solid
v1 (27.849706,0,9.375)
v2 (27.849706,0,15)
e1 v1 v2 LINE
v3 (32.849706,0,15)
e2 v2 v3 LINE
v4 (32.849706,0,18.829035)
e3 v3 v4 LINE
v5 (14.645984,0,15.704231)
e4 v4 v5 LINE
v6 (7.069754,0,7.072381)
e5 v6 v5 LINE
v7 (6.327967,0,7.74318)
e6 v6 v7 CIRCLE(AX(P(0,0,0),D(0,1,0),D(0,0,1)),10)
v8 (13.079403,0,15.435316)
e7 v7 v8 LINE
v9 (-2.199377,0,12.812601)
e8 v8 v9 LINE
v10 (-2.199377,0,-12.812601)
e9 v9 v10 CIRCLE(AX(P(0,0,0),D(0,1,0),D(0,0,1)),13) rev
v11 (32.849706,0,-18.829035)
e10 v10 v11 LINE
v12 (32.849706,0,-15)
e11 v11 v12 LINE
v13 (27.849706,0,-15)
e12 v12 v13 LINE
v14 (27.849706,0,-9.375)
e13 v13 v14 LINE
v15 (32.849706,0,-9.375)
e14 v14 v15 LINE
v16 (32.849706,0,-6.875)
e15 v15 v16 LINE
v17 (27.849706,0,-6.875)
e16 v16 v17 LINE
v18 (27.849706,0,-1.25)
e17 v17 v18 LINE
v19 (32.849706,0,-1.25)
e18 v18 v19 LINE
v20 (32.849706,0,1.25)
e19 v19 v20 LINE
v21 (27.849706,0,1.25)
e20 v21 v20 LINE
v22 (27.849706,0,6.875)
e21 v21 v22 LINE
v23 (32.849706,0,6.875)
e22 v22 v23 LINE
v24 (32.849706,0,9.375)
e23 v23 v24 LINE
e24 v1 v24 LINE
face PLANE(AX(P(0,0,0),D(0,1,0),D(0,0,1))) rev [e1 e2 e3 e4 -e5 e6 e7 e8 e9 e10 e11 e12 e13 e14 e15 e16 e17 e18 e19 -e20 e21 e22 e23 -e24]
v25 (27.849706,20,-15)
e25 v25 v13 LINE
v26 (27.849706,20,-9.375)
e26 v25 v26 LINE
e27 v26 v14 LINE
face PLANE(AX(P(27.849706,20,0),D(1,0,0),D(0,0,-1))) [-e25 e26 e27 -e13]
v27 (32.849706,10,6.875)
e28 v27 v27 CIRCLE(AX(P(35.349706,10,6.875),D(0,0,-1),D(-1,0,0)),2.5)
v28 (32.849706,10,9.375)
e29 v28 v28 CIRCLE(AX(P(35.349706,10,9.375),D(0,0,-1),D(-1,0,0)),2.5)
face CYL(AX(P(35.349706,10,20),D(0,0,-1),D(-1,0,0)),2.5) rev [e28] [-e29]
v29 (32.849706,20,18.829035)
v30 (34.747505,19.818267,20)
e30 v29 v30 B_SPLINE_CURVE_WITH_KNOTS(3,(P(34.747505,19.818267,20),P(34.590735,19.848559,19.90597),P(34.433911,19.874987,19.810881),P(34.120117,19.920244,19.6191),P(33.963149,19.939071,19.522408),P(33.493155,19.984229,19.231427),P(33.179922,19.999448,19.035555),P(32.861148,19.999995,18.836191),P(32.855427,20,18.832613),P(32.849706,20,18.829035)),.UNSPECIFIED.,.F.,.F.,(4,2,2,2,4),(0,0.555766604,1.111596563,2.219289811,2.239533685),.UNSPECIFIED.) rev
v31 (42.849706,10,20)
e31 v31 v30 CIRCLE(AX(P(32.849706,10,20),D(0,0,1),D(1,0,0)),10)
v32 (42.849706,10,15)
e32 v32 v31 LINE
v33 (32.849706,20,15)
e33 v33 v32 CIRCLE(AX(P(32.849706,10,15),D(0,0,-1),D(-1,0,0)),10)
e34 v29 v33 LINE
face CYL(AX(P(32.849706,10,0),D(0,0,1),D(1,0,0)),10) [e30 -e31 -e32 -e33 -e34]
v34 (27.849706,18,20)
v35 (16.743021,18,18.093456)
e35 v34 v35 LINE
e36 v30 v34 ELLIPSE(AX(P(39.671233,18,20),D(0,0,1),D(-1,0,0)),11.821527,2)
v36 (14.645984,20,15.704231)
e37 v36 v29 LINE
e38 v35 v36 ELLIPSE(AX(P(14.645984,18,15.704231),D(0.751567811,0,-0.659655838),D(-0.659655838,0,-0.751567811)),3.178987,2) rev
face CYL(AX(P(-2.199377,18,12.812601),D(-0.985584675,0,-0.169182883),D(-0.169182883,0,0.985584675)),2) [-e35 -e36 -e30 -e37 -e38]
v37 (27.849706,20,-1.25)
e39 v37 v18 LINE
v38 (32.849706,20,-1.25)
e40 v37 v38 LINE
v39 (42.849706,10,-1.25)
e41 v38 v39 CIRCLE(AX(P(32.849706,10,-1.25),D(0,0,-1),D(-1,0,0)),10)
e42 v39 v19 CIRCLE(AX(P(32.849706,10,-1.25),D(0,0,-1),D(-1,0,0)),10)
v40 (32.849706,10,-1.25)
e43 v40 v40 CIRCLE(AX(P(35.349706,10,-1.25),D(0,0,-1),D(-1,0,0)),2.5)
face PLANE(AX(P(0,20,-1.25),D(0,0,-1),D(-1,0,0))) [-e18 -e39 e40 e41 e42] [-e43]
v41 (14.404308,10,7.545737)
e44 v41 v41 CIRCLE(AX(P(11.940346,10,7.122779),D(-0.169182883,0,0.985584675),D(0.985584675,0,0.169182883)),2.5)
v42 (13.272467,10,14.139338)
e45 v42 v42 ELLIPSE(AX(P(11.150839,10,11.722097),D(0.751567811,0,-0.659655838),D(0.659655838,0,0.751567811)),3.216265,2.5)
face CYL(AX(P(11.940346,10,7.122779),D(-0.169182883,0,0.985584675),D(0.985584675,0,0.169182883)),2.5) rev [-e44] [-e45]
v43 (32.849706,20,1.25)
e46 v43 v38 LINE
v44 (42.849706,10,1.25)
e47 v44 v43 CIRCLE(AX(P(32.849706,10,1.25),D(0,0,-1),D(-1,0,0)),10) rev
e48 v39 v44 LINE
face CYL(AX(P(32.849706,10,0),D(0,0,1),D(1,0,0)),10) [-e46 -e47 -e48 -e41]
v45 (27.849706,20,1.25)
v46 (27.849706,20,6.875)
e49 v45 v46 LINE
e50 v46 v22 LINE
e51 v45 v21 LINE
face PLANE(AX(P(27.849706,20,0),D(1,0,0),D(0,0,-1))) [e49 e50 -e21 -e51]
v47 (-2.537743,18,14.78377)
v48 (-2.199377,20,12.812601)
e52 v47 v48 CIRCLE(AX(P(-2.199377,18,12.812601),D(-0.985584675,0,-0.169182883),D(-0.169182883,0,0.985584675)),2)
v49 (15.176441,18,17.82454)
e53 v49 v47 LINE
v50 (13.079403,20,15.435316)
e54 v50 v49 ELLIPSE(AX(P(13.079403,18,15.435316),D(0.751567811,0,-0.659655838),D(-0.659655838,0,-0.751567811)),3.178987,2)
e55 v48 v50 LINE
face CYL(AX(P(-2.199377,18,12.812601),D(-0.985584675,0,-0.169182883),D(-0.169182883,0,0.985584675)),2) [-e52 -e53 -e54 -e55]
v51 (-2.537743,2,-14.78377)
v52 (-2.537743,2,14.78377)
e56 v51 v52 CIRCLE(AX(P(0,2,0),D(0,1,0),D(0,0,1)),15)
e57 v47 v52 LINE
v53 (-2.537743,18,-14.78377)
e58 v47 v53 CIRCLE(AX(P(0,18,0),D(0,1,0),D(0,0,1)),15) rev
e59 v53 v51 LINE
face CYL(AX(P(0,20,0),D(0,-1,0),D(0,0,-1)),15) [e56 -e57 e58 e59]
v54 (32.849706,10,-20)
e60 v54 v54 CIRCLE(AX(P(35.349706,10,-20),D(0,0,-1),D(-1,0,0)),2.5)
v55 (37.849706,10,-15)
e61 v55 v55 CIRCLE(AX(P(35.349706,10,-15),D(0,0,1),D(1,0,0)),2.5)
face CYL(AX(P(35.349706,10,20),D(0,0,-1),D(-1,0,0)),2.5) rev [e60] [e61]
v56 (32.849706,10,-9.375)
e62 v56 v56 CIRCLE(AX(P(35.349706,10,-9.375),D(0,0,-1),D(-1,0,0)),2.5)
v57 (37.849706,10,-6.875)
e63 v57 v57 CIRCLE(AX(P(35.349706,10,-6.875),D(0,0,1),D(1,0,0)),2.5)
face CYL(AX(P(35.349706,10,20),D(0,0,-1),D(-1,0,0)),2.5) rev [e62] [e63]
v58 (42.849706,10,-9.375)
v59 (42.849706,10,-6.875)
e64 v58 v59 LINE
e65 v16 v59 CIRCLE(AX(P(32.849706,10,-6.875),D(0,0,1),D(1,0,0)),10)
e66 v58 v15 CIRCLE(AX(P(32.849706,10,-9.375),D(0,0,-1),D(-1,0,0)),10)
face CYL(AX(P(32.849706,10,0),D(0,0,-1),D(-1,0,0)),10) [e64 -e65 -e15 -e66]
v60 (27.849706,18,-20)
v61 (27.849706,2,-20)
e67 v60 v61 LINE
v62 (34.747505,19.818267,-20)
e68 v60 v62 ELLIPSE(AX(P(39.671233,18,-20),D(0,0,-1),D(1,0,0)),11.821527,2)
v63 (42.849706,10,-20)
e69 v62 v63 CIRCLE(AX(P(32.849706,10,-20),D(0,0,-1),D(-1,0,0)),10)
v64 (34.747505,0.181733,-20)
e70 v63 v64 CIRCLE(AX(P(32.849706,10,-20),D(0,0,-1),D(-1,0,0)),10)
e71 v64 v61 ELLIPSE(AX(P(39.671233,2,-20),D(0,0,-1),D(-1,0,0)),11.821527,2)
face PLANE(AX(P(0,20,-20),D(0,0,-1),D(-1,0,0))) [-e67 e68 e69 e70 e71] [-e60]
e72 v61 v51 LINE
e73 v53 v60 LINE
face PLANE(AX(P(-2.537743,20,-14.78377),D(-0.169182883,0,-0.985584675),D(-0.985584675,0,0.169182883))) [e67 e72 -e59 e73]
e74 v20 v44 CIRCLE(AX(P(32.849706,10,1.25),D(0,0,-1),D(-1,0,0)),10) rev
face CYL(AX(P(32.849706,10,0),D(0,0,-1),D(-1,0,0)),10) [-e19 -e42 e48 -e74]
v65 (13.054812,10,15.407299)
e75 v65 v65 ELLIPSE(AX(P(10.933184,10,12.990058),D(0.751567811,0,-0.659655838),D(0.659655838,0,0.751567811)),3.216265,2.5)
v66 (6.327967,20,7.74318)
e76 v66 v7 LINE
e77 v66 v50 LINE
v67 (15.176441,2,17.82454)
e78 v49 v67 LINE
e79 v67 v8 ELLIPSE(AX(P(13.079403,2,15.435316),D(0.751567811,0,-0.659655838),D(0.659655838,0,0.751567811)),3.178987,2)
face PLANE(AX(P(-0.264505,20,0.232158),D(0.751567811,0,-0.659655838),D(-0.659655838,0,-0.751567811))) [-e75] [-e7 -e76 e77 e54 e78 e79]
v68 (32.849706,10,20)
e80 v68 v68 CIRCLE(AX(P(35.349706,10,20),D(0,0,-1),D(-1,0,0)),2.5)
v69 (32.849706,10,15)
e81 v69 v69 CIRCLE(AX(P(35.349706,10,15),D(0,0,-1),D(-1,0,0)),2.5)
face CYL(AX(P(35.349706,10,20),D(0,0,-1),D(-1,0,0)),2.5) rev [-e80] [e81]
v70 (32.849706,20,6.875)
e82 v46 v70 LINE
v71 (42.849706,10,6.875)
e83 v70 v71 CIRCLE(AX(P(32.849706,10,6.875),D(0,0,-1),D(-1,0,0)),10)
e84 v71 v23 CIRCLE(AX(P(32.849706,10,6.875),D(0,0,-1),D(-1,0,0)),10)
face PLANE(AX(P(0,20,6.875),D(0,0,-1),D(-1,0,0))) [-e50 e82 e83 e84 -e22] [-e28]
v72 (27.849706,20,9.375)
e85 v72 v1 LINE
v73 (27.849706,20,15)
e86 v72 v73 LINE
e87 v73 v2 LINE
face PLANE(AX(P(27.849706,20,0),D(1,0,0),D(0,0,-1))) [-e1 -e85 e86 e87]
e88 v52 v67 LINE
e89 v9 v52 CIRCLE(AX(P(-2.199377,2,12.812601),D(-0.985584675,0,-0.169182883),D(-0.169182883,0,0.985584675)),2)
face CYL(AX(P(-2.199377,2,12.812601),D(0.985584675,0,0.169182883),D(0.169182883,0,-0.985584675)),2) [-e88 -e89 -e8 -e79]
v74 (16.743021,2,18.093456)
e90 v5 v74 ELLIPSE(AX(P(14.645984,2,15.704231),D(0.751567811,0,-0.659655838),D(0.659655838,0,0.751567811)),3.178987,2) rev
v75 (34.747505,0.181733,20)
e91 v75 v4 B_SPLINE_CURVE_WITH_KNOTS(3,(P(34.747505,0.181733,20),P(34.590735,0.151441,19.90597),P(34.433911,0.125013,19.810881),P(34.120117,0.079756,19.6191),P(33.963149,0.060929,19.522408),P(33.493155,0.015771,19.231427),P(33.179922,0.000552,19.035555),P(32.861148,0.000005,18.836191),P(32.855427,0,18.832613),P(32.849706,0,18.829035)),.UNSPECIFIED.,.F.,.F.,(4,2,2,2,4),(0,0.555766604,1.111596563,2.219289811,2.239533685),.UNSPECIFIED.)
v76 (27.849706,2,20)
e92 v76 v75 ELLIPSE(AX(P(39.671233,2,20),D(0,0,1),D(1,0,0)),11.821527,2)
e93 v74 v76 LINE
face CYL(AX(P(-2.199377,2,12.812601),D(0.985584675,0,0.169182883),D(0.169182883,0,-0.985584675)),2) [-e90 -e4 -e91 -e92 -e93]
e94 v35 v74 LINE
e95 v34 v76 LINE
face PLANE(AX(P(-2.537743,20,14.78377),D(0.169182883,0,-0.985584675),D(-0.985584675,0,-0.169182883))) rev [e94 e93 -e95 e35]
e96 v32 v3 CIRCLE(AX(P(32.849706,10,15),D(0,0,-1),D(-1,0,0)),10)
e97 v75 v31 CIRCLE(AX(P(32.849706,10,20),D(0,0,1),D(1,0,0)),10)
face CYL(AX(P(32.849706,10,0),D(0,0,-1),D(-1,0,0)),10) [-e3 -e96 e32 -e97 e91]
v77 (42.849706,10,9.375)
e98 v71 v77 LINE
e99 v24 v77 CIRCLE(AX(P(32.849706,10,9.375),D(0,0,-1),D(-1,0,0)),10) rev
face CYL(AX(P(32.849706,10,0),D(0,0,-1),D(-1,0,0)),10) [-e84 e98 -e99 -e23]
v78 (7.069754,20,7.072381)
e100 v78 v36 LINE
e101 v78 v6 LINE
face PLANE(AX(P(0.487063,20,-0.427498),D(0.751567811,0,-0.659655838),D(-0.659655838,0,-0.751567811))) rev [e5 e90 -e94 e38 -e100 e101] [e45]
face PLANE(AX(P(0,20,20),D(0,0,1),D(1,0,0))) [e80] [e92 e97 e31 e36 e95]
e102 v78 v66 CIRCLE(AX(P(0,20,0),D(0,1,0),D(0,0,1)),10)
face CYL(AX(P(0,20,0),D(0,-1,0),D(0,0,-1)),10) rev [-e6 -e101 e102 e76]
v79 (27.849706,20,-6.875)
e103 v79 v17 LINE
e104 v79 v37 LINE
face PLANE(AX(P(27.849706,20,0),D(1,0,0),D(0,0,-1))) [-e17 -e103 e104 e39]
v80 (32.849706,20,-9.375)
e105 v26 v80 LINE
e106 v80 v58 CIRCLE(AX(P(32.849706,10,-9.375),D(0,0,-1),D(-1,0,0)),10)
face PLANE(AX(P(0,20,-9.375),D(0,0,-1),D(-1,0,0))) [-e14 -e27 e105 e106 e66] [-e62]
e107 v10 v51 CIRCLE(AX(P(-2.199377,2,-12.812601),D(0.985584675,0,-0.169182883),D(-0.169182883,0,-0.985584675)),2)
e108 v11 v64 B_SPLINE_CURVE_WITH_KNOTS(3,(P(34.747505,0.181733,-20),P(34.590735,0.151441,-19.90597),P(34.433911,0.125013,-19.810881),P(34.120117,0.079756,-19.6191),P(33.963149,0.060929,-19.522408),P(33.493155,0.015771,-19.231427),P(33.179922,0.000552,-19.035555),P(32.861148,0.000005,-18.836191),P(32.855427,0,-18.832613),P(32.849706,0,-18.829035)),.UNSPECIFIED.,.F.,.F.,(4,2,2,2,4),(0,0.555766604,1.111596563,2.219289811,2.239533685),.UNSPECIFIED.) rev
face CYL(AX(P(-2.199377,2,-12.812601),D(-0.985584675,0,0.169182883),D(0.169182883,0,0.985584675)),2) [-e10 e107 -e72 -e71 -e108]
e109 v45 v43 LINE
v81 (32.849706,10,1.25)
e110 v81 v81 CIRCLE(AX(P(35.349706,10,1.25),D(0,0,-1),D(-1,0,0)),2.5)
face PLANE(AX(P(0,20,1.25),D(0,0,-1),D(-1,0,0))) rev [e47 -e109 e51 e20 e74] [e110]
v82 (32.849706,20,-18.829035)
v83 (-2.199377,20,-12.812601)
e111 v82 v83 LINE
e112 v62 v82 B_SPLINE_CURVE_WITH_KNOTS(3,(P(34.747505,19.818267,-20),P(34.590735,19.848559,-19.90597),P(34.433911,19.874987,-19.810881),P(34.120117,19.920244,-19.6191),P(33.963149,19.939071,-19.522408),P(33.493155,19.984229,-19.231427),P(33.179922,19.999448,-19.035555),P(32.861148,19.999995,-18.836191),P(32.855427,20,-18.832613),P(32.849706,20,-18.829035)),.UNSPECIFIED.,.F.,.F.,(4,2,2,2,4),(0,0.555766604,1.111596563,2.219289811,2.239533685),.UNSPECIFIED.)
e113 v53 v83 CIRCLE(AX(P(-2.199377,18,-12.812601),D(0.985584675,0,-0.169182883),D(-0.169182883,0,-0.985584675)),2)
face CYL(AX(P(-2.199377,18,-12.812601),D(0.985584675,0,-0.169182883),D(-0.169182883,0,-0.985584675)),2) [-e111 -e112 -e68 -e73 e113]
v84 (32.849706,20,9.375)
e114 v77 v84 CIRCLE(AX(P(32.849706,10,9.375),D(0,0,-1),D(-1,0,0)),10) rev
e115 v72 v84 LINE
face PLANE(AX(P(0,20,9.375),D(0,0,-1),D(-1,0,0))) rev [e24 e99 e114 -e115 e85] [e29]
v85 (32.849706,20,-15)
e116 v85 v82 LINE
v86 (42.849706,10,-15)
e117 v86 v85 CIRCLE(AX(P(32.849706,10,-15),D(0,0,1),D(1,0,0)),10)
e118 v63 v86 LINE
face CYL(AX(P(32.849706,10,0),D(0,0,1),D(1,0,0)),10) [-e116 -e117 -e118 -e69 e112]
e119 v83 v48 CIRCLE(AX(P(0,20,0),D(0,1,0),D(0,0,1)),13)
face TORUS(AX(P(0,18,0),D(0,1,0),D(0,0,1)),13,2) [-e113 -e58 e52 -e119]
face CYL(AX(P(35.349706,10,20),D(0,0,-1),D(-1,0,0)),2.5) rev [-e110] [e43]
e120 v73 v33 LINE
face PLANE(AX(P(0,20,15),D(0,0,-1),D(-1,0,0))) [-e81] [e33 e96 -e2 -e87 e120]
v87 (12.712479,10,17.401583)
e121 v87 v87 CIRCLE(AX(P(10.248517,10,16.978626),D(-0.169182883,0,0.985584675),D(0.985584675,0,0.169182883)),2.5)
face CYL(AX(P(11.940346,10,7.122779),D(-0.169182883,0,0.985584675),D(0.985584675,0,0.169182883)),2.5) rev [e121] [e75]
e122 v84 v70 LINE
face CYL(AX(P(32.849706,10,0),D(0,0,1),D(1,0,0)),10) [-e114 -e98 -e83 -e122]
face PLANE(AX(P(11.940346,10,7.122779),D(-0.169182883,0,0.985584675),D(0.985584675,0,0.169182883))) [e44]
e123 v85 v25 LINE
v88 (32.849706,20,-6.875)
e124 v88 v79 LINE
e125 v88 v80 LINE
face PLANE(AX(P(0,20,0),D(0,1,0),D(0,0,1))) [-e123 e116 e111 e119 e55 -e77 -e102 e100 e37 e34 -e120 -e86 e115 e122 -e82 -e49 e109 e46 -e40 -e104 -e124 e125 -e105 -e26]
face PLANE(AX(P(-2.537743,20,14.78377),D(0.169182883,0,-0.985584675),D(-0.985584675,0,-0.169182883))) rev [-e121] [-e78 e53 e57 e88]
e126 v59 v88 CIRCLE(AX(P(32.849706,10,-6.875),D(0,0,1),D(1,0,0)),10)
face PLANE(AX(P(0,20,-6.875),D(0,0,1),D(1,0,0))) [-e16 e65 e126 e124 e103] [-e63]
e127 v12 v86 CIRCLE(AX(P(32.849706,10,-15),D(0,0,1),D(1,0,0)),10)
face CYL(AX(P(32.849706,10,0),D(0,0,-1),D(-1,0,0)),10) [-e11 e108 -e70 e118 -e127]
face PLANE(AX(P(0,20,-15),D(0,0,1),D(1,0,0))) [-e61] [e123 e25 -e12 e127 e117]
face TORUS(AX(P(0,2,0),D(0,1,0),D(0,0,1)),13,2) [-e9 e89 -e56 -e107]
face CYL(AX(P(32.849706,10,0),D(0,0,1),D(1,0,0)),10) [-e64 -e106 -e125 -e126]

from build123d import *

# Parameters (mm, degrees)
BOSS_EXTRUDE1_DEPTH = 20
FILLET1_R           = 10
SKETCH2_R           = 2.5
CUT_EXTRUDE1_DEPTH  = 40
FILLET2_R           = 2
SKETCH3_R           = 2.5
CUT_EXTRUDE2_DEPTH  = 10


# Some blends are built 0.0001 mm under size
with BuildPart() as part:
    # Sketch1 → Boss-Extrude1 (new body)
    with BuildSketch(Plane(origin=(0, 0, 0), x_dir=(1, 0, 0), z_dir=(0, 1, 0))):
        with BuildLine():
            Line((27.849705815, 9.375), (27.849705815, 15))
            Line((27.849705815, 15), (42.849705815, 15))
            Line((42.849705815, 15), (42.849705815, 20))
            Line((42.849705815, 20), (27.849705815, 20))
            Line((27.849705815, 20), (-2.537743238, 14.78377013))
            ThreePointArc((-2.537743238, 14.78377013), (-15, 0), (-2.537743238, -14.78377013))
            Line((-2.537743238, -14.78377013), (15.176440556, -17.824540498))
            Line((15.176440556, -17.824540498), (6.327966589, -7.743180151))
            ThreePointArc((6.327966589, -7.743180151), (-6.707251498, 7.417059885), (7.069754095, -7.072381285))
            Line((7.069754095, -7.072381285), (16.743020962, -18.093455585))
            Line((16.743020962, -18.093455585), (27.849705815, -20))
            Line((27.849705815, -20), (42.849705815, -20))
            Line((42.849705815, -20), (42.849705815, -15))
            Line((42.849705815, -15), (27.849705815, -15))
            Line((27.849705815, -15), (27.849705815, -9.375))
            Line((27.849705815, -9.375), (42.849705815, -9.375))
            Line((42.849705815, -9.375), (42.849705815, -6.875))
            Line((42.849705815, -6.875), (27.849705815, -6.875))
            Line((27.849705815, -6.875), (27.849705815, -1.25))
            Line((27.849705815, -1.25), (42.849705815, -1.25))
            Line((42.849705815, -1.25), (42.849705815, 1.25))
            Line((42.849705815, 1.25), (27.849705815, 1.25))
            Line((27.849705815, 1.25), (27.849705815, 6.875))
            Line((27.849705815, 6.875), (42.849705815, 6.875))
            Line((42.849705815, 6.875), (42.849705815, 9.375))
            Line((42.849705815, 9.375), (27.849705815, 9.375))
        make_face()
    extrude(amount=BOSS_EXTRUDE1_DEPTH)

    # Fillet1
    fillet1_edges = [part.edges().sort_by_distance(p)[0] for p in [
        (42.849705815, 0, 17.5),
        (42.849705815, 0, 8.125),
        (42.849705815, 0, 0),
        (42.849705815, 0, -8.125),
        (42.849705815, 0, -17.5),
        (42.849705815, 20, -17.5),
        (42.849705815, 20, -8.125),
        (42.849705815, 20, 0),
        (42.849705815, 20, 8.125),
        (42.849705815, 20, 17.5),
    ]]
    fillet(fillet1_edges, radius=FILLET1_R - 0.0001)  # a hair under: the kernel refuses the full size

    # Sketch2 → Cut-Extrude1 (cut)
    with BuildSketch(Plane(origin=(0, 0, -20), x_dir=(-1, 0, 0), z_dir=(0, 0, -1))):
        with Locations((-35.349705815, 10)):
            Circle(SKETCH2_R)
    extrude(amount=-CUT_EXTRUDE1_DEPTH, mode=Mode.SUBTRACT)

    # Fillet2
    # the kernel refuses this fillet: 2 mm, written as the material it takes off along each edge
    with BuildSketch(Plane(origin=(39.676721919, 0, -22.03019459), x_dir=(0.16918288251037936, 0, 0.9855846753402162), z_dir=(-0.9855846753402161, 0, 0.16918288251037933))) as fillet2_piece_1:
        with BuildLine():
            CenterArc((FILLET2_R, FILLET2_R), FILLET2_R, 180, 90)
            Line((0, FILLET2_R), (-FILLET2_R * 0.02, FILLET2_R))
            Line((-FILLET2_R * 0.02, FILLET2_R), (-FILLET2_R * 0.02, -FILLET2_R * 0.02))
            Line((-FILLET2_R * 0.02, -FILLET2_R * 0.02), (FILLET2_R, -FILLET2_R * 0.02))
            Line((FILLET2_R, -FILLET2_R * 0.02), (FILLET2_R, 0))
        make_face()
    extrude(amount=42.831900914, mode=Mode.SUBTRACT)
    with BuildSketch(Plane(origin=(-2.537743238, 0, 14.78377013), x_dir=(0.16918288251037944, 0, -0.9855846753402161), z_dir=(0.9855846753402161, 0, 0.16918288251037944))) as fillet2_piece_2:
        with BuildLine():
            CenterArc((FILLET2_R, FILLET2_R), FILLET2_R, 180, 90)
            Line((0, FILLET2_R), (-FILLET2_R * 0.02, FILLET2_R))
            Line((-FILLET2_R * 0.02, FILLET2_R), (-FILLET2_R * 0.02, -FILLET2_R * 0.02))
            Line((-FILLET2_R * 0.02, -FILLET2_R * 0.02), (FILLET2_R, -FILLET2_R * 0.02))
            Line((FILLET2_R, -FILLET2_R * 0.02), (FILLET2_R, 0))
        make_face()
    extrude(amount=29.973274379, mode=Mode.SUBTRACT)
    with BuildSketch(Plane(origin=(39.676721919, 20, -22.03019459), x_dir=(0.16918288251037936, 0, 0.9855846753402162), z_dir=(-0.9855846753402161, 0, 0.16918288251037933))) as fillet2_piece_3:
        with BuildLine():
            CenterArc((FILLET2_R, -FILLET2_R), FILLET2_R, 90, 90)
            Line((0, -FILLET2_R), (-FILLET2_R * 0.02, -FILLET2_R))
            Line((-FILLET2_R * 0.02, -FILLET2_R), (-FILLET2_R * 0.02, FILLET2_R * 0.02))
            Line((-FILLET2_R * 0.02, FILLET2_R * 0.02), (FILLET2_R, FILLET2_R * 0.02))
            Line((FILLET2_R, FILLET2_R * 0.02), (FILLET2_R, 0))
        make_face()
    extrude(amount=42.831900914, mode=Mode.SUBTRACT)
    with BuildSketch(Plane(origin=(-2.537743238, 20, 14.78377013), x_dir=(0.16918288251037944, 0, -0.9855846753402161), z_dir=(0.9855846753402161, 0, 0.16918288251037944))) as fillet2_piece_4:
        with BuildLine():
            CenterArc((FILLET2_R, -FILLET2_R), FILLET2_R, 90, 90)
            Line((0, -FILLET2_R), (-FILLET2_R * 0.02, -FILLET2_R))
            Line((-FILLET2_R * 0.02, -FILLET2_R), (-FILLET2_R * 0.02, FILLET2_R * 0.02))
            Line((-FILLET2_R * 0.02, FILLET2_R * 0.02), (FILLET2_R, FILLET2_R * 0.02))
            Line((FILLET2_R, FILLET2_R * 0.02), (FILLET2_R, 0))
        make_face()
    extrude(amount=29.973274379, mode=Mode.SUBTRACT)
    with BuildSketch(Plane(origin=(4.916004858, 0, 16.063260995), x_dir=(0.16918288251037944, 0, -0.9855846753402161), z_dir=(0.9855846753402161, 0, 0.16918288251037944))) as fillet2_piece_5:
        with BuildLine():
            CenterArc((FILLET2_R, FILLET2_R), FILLET2_R, 180, 90)
            Line((0, FILLET2_R), (-FILLET2_R * 0.02, FILLET2_R))
            Line((-FILLET2_R * 0.02, FILLET2_R), (-FILLET2_R * 0.02, -FILLET2_R * 0.02))
            Line((-FILLET2_R * 0.02, -FILLET2_R * 0.02), (FILLET2_R, -FILLET2_R * 0.02))
            Line((FILLET2_R, -FILLET2_R * 0.02), (FILLET2_R, 0))
        make_face()
    extrude(amount=35.269133064, mode=Mode.SUBTRACT)
    with BuildSketch(Plane(origin=(4.916004858, 20, 16.063260995), x_dir=(0.16918288251037944, 0, -0.9855846753402161), z_dir=(0.9855846753402161, 0, 0.16918288251037944))) as fillet2_piece_6:
        with BuildLine():
            CenterArc((FILLET2_R, -FILLET2_R), FILLET2_R, 90, 90)
            Line((0, -FILLET2_R), (-FILLET2_R * 0.02, -FILLET2_R))
            Line((-FILLET2_R * 0.02, -FILLET2_R), (-FILLET2_R * 0.02, FILLET2_R * 0.02))
            Line((-FILLET2_R * 0.02, FILLET2_R * 0.02), (FILLET2_R, FILLET2_R * 0.02))
            Line((FILLET2_R, FILLET2_R * 0.02), (FILLET2_R, 0))
        make_face()
    extrude(amount=35.269133064, mode=Mode.SUBTRACT)
    with BuildSketch(Plane(origin=(0, 0, 0), x_dir=(-0.16918288251037905, 0, -0.9855846753402162), z_dir=(0.9855846753402162, 0, -0.16918288251037905))) as fillet2_piece_7:
        with BuildLine():
            CenterArc((15 - FILLET2_R, FILLET2_R), FILLET2_R, 270, 90)
            Line((15, FILLET2_R), (15 + FILLET2_R * 0.02, FILLET2_R))
            Line((15 + FILLET2_R * 0.02, FILLET2_R), (15 + FILLET2_R * 0.02, -FILLET2_R * 0.02))
            Line((15 + FILLET2_R * 0.02, -FILLET2_R * 0.02), (15 - FILLET2_R, -FILLET2_R * 0.02))
            Line((15 - FILLET2_R, -FILLET2_R * 0.02), (15 - FILLET2_R, 0))
        make_face()
    revolve(axis=Axis((0, 0, 0), (0, 1, 0)), revolution_arc=160.519372943, mode=Mode.SUBTRACT)
    with BuildSketch(Plane(origin=(0, 20, 0), x_dir=(-0.16918288251037905, 0, -0.9855846753402162), z_dir=(0.9855846753402162, 0, -0.16918288251037905))) as fillet2_piece_8:
        with BuildLine():
            CenterArc((15 - FILLET2_R, -FILLET2_R), FILLET2_R, 0, 90)
            Line((15, -FILLET2_R), (15 + FILLET2_R * 0.02, -FILLET2_R))
            Line((15 + FILLET2_R * 0.02, -FILLET2_R), (15 + FILLET2_R * 0.02, FILLET2_R * 0.02))
            Line((15 + FILLET2_R * 0.02, FILLET2_R * 0.02), (15 - FILLET2_R, FILLET2_R * 0.02))
            Line((15 - FILLET2_R, FILLET2_R * 0.02), (15 - FILLET2_R, 0))
        make_face()
    revolve(axis=Axis((0, 20, 0), (0, 1, 0)), revolution_arc=160.519372943, mode=Mode.SUBTRACT)

    # Sketch3 → Cut-Extrude2 (cut)
    with BuildSketch(Plane(origin=(-2.537743238, 0, 14.78377013), x_dir=(0.9855846753402161, 0, 0.16918288251037955), z_dir=(-0.16918288251037955, 0, 0.9855846753402161))):
        with Locations((12.973274379, 10)):
            Circle(SKETCH3_R)
    extrude(amount=-CUT_EXTRUDE2_DEPTH, mode=Mode.SUBTRACT)


solid = part.part
